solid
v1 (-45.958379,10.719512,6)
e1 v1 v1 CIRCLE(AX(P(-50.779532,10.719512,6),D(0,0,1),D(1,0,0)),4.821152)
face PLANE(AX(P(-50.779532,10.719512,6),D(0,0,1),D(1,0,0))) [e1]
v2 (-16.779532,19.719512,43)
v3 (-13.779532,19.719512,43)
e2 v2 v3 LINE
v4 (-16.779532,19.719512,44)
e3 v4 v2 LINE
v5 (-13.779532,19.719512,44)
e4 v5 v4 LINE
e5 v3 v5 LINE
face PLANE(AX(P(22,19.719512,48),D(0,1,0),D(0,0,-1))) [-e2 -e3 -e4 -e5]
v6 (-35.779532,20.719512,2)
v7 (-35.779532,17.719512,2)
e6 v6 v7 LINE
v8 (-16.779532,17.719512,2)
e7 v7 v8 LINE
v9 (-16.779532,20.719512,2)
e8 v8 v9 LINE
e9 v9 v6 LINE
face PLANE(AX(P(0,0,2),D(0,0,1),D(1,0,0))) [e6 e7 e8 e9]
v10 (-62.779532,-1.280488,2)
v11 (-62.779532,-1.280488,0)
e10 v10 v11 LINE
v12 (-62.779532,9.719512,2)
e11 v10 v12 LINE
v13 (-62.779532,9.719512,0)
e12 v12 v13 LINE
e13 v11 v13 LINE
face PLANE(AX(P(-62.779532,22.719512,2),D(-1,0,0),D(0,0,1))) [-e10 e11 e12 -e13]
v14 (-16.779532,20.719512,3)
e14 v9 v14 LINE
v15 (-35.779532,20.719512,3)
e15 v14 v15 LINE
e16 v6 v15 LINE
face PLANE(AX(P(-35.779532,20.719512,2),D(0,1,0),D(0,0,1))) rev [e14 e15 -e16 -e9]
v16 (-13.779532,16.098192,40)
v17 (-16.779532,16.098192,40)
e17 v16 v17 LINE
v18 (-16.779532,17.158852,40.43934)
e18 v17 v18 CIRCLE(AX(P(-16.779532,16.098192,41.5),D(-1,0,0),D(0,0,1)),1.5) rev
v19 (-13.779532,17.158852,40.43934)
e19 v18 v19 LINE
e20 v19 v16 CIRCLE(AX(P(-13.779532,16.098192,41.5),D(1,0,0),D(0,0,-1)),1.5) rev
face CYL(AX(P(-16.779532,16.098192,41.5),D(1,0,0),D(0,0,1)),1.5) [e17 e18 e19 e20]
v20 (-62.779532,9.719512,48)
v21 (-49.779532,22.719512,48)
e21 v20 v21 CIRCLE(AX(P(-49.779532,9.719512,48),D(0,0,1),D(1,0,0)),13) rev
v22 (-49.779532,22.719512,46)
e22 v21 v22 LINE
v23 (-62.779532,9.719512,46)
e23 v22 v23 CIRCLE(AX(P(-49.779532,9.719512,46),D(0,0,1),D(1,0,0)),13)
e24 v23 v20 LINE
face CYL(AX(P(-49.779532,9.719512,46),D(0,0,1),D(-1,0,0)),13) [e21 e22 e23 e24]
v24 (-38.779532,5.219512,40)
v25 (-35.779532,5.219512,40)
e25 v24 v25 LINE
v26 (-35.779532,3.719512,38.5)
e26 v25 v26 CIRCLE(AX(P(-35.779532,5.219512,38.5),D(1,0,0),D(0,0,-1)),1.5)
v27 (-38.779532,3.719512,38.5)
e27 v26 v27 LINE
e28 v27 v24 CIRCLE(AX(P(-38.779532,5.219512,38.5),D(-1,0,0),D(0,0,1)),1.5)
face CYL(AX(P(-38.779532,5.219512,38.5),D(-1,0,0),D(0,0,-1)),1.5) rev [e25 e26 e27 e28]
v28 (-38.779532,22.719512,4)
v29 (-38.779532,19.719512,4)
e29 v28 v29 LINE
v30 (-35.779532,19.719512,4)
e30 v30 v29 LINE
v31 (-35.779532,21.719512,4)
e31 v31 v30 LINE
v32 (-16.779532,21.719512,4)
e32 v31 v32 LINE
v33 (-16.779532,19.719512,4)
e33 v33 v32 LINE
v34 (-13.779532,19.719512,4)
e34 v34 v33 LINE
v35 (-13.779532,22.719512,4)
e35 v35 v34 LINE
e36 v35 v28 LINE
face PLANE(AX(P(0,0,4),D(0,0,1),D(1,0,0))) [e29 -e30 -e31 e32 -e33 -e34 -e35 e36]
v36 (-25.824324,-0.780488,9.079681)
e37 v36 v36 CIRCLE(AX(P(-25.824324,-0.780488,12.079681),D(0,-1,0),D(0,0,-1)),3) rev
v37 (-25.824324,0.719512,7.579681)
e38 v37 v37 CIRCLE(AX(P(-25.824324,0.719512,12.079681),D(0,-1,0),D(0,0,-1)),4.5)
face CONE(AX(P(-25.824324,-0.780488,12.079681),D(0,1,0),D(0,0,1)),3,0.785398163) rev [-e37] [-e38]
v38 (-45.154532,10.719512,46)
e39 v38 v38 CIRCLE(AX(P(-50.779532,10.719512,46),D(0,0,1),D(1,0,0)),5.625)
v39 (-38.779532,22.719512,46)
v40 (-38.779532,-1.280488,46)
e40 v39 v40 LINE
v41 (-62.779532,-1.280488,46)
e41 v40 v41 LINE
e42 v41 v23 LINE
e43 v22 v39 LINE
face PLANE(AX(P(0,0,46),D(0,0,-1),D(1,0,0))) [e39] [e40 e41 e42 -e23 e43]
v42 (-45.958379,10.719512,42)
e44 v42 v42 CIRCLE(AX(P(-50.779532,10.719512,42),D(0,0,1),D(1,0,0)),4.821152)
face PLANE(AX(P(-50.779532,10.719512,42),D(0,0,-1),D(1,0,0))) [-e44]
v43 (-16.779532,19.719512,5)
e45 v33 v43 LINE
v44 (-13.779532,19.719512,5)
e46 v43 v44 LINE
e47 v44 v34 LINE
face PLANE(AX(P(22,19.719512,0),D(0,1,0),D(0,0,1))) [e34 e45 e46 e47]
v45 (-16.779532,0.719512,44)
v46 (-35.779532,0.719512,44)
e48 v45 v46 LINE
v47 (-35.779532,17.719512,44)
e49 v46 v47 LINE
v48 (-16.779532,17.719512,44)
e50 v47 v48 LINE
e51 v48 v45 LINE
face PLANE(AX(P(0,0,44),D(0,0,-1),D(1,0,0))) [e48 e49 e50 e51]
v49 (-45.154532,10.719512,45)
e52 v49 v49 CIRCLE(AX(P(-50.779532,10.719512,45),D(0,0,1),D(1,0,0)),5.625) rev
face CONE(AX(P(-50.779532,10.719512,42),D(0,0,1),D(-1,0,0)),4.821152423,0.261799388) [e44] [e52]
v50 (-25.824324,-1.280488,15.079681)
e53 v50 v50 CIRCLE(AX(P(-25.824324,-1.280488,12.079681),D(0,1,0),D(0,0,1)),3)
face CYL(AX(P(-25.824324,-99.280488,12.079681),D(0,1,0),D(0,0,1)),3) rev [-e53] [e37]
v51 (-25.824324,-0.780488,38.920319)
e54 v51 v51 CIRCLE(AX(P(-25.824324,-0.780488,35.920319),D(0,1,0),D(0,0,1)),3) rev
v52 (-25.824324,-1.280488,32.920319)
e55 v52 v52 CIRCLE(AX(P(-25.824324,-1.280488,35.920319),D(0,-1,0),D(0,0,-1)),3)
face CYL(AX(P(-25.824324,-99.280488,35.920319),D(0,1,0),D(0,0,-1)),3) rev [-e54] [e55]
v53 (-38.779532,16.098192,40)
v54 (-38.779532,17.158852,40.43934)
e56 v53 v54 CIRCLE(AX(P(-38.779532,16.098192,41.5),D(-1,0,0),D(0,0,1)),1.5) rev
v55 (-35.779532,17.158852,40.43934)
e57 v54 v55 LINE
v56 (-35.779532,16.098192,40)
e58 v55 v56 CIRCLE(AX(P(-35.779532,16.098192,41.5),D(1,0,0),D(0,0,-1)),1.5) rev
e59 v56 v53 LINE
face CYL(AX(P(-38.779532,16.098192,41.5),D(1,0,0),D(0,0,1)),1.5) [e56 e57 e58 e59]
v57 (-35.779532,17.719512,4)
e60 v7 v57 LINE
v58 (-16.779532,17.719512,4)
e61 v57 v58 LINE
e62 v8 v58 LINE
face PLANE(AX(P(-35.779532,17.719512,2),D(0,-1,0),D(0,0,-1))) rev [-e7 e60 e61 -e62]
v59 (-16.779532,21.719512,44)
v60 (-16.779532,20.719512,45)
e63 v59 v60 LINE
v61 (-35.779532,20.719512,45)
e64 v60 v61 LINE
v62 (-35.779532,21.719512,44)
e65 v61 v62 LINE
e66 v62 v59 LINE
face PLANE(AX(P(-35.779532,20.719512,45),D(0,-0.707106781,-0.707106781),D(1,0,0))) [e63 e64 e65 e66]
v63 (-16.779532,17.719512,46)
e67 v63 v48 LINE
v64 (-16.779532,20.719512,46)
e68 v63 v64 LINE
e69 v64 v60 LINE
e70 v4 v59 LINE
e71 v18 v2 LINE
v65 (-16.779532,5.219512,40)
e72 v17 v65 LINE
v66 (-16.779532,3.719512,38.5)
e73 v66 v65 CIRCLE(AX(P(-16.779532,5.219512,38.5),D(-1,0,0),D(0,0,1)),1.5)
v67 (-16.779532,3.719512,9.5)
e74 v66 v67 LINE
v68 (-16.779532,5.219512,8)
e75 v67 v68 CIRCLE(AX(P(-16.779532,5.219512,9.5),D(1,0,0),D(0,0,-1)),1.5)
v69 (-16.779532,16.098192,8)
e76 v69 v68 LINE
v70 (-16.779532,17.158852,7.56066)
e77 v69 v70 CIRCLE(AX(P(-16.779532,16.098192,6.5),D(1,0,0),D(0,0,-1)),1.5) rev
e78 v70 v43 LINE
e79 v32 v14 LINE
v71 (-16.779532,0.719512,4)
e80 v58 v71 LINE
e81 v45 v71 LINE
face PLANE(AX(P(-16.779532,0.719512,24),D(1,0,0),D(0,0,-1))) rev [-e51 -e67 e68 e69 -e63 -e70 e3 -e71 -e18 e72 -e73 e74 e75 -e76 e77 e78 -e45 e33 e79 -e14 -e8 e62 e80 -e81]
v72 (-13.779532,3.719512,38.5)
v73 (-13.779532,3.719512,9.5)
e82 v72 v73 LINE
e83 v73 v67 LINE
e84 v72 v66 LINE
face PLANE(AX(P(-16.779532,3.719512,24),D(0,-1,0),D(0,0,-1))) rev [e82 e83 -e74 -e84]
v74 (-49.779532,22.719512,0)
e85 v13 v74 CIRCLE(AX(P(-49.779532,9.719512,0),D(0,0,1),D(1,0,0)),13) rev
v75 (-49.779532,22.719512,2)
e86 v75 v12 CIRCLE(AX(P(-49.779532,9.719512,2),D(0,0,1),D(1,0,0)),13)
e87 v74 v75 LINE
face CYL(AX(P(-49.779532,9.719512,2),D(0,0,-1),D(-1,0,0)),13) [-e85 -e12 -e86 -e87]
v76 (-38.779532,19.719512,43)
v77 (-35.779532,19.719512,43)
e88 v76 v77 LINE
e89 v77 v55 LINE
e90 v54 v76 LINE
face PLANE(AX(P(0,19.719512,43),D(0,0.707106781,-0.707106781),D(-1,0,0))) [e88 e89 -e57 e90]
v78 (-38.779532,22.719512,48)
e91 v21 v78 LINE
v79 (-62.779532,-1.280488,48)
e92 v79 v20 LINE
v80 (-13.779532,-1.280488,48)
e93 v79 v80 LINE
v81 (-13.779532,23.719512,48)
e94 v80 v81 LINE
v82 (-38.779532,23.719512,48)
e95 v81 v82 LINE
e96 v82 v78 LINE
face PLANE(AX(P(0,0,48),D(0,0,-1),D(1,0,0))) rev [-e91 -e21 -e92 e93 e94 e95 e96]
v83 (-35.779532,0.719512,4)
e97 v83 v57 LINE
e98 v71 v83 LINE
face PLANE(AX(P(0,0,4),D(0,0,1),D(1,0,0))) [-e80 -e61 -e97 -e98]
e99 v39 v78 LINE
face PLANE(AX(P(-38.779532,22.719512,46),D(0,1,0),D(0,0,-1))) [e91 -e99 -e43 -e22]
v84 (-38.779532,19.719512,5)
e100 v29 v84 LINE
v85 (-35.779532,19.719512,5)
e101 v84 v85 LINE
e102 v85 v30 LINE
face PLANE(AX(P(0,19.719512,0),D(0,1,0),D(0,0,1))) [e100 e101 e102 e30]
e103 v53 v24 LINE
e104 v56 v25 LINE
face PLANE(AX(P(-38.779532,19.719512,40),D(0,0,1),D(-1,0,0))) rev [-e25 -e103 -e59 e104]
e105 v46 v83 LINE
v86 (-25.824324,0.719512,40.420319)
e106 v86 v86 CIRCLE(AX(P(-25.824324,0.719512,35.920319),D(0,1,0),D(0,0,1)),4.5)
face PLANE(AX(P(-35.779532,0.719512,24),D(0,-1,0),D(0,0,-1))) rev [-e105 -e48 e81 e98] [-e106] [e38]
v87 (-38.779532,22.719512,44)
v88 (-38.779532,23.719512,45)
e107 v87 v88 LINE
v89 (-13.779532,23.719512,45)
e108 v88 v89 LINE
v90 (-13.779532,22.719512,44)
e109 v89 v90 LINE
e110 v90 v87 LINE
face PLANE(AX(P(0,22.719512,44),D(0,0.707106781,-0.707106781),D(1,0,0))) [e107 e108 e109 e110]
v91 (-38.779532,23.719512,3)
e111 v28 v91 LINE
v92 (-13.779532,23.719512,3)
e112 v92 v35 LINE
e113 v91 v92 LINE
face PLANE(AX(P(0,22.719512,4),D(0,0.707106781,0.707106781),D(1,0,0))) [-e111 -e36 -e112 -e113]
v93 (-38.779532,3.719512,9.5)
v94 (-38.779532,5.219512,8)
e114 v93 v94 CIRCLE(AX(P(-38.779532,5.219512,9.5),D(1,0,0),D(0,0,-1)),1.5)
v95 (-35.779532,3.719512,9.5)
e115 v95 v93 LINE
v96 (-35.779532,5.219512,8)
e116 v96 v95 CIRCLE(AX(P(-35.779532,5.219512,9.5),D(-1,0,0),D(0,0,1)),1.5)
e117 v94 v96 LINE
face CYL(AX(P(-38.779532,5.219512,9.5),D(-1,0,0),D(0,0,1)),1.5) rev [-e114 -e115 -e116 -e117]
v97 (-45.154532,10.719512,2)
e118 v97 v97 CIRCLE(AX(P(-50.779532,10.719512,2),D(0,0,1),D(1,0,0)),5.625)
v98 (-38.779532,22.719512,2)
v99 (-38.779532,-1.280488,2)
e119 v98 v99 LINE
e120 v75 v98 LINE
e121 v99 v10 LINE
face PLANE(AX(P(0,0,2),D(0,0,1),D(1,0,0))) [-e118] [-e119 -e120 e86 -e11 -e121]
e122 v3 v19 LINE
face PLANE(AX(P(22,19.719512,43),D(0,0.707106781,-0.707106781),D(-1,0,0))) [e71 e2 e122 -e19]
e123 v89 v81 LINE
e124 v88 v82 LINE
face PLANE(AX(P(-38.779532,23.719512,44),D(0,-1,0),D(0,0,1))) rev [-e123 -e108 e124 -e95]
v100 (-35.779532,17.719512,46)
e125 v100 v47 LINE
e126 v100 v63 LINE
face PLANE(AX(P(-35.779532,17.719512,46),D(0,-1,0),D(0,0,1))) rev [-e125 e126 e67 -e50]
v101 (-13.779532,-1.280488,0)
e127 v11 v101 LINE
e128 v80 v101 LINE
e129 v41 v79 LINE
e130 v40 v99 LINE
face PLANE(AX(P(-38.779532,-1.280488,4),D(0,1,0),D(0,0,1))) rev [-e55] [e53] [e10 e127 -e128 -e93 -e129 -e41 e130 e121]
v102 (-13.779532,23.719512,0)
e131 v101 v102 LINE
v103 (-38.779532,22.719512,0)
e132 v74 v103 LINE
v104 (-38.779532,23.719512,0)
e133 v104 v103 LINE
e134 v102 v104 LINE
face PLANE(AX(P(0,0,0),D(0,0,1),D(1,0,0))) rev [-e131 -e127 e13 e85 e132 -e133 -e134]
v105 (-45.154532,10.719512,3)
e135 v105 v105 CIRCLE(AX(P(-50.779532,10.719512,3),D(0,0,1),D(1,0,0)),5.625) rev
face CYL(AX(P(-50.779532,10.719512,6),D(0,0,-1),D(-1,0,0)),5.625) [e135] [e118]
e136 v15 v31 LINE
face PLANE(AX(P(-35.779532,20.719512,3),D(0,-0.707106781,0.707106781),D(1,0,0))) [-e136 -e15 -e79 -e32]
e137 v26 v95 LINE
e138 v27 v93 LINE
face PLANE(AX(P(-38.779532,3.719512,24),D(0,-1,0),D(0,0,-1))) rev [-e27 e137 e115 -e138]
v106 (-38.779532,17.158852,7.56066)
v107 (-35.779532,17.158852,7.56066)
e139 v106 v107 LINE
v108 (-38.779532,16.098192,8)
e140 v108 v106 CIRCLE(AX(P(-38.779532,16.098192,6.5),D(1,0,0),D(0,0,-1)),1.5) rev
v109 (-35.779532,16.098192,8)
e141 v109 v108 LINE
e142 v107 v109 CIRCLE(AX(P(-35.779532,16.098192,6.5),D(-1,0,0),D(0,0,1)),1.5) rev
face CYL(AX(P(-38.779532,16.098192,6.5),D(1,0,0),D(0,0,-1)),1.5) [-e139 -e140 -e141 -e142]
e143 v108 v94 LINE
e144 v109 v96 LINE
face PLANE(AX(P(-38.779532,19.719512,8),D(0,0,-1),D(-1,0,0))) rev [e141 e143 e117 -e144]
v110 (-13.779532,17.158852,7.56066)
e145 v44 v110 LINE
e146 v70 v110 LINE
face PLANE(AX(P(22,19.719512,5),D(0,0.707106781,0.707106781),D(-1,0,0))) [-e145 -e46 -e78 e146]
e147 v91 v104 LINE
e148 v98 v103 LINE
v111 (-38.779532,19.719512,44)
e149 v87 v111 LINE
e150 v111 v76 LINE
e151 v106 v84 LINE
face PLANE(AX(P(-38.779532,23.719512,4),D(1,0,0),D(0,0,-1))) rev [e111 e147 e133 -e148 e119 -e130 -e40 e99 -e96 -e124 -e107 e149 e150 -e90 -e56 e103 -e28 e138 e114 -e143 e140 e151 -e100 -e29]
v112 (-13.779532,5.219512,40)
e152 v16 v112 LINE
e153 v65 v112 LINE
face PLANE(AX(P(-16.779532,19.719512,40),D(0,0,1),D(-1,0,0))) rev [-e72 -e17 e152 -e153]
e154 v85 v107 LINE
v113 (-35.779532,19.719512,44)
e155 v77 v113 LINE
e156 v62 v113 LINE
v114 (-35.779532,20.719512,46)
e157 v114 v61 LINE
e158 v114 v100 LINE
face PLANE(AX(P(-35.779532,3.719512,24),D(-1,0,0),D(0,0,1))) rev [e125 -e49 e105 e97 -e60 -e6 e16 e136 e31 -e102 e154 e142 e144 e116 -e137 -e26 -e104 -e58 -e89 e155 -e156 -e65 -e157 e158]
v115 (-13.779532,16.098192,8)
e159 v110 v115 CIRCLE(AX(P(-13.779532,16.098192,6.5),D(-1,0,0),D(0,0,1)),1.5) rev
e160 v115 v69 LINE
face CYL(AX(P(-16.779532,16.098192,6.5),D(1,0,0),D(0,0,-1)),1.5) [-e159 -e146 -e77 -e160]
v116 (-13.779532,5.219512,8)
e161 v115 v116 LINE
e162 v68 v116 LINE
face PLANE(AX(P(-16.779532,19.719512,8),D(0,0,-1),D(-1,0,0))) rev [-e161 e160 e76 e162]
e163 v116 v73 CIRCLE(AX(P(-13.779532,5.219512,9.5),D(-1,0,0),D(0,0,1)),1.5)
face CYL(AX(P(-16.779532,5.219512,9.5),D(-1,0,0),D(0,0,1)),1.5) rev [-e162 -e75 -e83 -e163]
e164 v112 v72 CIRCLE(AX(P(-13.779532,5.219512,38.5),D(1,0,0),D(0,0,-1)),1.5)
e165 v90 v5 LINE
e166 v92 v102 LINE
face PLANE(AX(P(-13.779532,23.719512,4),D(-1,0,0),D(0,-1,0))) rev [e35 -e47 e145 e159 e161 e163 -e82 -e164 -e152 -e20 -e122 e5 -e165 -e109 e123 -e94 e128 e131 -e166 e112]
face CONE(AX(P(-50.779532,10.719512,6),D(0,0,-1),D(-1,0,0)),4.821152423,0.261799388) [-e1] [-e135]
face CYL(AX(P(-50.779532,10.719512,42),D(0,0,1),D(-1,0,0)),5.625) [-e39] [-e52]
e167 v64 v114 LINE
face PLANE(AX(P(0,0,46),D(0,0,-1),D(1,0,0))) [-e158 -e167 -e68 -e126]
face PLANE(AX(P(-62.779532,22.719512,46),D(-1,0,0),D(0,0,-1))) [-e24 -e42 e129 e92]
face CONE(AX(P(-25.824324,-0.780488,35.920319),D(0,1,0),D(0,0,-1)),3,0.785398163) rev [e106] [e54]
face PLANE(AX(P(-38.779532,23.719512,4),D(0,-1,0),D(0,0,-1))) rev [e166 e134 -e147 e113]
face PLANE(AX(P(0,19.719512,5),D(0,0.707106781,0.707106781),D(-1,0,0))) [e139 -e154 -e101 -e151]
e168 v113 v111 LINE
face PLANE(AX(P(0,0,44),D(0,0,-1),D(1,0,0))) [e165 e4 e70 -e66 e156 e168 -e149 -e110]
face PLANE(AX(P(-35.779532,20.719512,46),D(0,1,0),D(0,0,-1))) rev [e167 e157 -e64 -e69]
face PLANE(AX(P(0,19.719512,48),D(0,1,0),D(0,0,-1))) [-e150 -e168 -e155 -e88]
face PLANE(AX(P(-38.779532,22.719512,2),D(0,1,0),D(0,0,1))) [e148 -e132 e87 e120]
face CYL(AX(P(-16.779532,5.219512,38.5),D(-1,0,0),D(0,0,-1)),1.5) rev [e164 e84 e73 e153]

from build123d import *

# Parameters (mm, degrees)
SKETCH_1_W             = 25
SKETCH_1_H             = 25
EXTRUDE_1_DEPTH        = 4
SKETCH_2_W             = 24
SKETCH_2_H             = 24
EXTRUDE_2_DEPTH        = 2
SKETCH_3_R             = 5.625
EXTRUDE_3_DEPTH        = 4
CHAMFER_1_SIZE         = 3
CHAMFER_1_SIZE2        = 0.803847577
EXTRUDE_4_DEPTH        = 2
SKETCH_6_R             = 5
CUT_EXTRUDE_2_DEPTH    = 10
EXTRUDE_6_DEPTH        = 20
SKETCH_9_W             = 19
SKETCH_9_H             = 3
CUT_EXTRUDE_4_DEPTH    = 2
CHAMFER_2_SIZE         = 1
CHAMFER_3_SIZE         = 3.732050808
CHAMFER_3_SIZE_2       = 1
FILLET_1_R             = 13
CHAMFER_4_SIZE         = 1
SKETCH_11_W            = 3
SKETCH_11_H            = 4
EXTRUDE_7_DEPTH        = 16
PATTERN_LINEAR_1_COUNT = 2
PATTERN_LINEAR_1_PITCH = 22
CHAMFER_6_SIZE         = 3
FILLET_2_R             = 1.5
SKETCH_13_W            = 40.293086247
SKETCH_13_H            = 27.591529789
CUT_EXTRUDE_6_DEPTH    = 100
SKETCH_14_R            = 3
CUT_EXTRUDE_7_DEPTH    = 100
CHAMFER_7_SIZE         = 1.5


with BuildPart() as part:
    # Эскиз1 → Бобышка-Вытянуть1 (new body)
    with BuildSketch(Plane.XY):
        with Locations((-26.279531703, 11.219512195)):
            Rectangle(SKETCH_1_W, SKETCH_1_H)
    extrude(amount=EXTRUDE_1_DEPTH)

    # Эскиз2 → Бобышка-Вытянуть2 (add)
    with BuildSketch(Plane(origin=(0, 0, 0), x_dir=(-1, 0, 0), z_dir=(0, 0, -1))):
        with Locations((50.779531703, 10.719512195)):
            Rectangle(SKETCH_2_W, SKETCH_2_H)
    extrude(amount=-EXTRUDE_2_DEPTH)

    # Эскиз3 → Бобышка-Вытянуть3 (add)
    with BuildSketch(Plane.XY.offset(2)):
        with Locations((-50.779531703, 10.719512195)):
            Circle(SKETCH_3_R)
    extrude(amount=EXTRUDE_3_DEPTH)

    # Фаска1
    chamfer_1_edges = [part.edges().sort_by_distance(p)[0] for p in [
        (-56.404531703, 10.719512195, 6),
    ]]
    chamfer_1_side = [part.faces().sort_by_distance(p)[0] for p in [
        (-56.404531703, 10.719512195, 4),
    ]]
    chamfer(chamfer_1_edges, length=CHAMFER_1_SIZE, length2=CHAMFER_1_SIZE2, reference=chamfer_1_side[0])

    # Эскиз5 → Бобышка-Вытянуть4 (add)
    with BuildSketch(Plane.XY.offset(4)):
        with BuildLine():
            Line((-18.981970926, 22.719512195), (-0.779531703, 22.719512195))
            ThreePointArc((-0.779531703, 22.719512195), (11.220468297, 10.719512195), (-0.779531703, -1.280487805))
            Line((-0.779531703, -1.280487805), (-18.981970926, -1.280487805))
            ThreePointArc((-18.981970926, -1.280487805), (-30.981970926, 10.719512195), (-18.981970926, 22.719512195))
        make_face()
    extrude(amount=-EXTRUDE_4_DEPTH)

    # Эскиз6 → Вырез-Вытянуть2 (cut)
    with BuildSketch(Plane(origin=(0, 0, 2), x_dir=(-1, 0, 0), z_dir=(0, 0, -1))):
        with Locations((0.779531703, 10.719512195)):
            Circle(SKETCH_6_R)
    extrude(amount=-CUT_EXTRUDE_2_DEPTH, mode=Mode.SUBTRACT)

    # Эскиз8 → Бобышка-Вытянуть6 (add)
    with BuildSketch(Plane.XY.offset(4)):
        Polygon((-38.779531703, 3.719512195), (-35.779531703, 3.719512195), (-35.779531703, 0.719512195), (-16.779531703, 0.719512195), (-16.779531703, 3.719512195), (-13.779531703, 3.719512195), (-13.779531703, -1.280487805), (-38.779531703, -1.280487805), align=None)
    extrude(amount=EXTRUDE_6_DEPTH)

    # Эскиз9 → Вырез-Вытянуть4 (cut)
    with BuildSketch(Plane.XY.offset(4)):
        with Locations((-26.279531703, 19.219512195)):
            Rectangle(SKETCH_9_W, SKETCH_9_H)
    extrude(amount=-CUT_EXTRUDE_4_DEPTH, mode=Mode.SUBTRACT)

    # Фаска2
    chamfer_2_edges = [part.edges().sort_by_distance(p)[0] for p in [
        (-26.279531703, 20.719512195, 4),
    ]]
    chamfer(chamfer_2_edges, length=CHAMFER_2_SIZE)

    # Фаска3
    # the kernel refuses this chamfer: 3.732050808, 1 mm, written as the material it takes off along each edge
    with BuildSketch(Plane(origin=(-0.779531703, 10.719512195, 2), x_dir=(-1, 0, 0), z_dir=(0, -1, 0))) as chamfer_3_piece_1:
        Polygon((5, -CHAMFER_3_SIZE), (5 + CHAMFER_3_SIZE_2, 0), (5, 0), align=None)
    revolve(axis=Axis((-0.779531703, 10.719512195, 2), (0, 0, -1)), mode=Mode.SUBTRACT)

    # Скругление1
    fillet_1_edges = [part.edges().sort_by_distance(p)[0] for p in [
        (-62.779531703, 22.719512195, 1),
    ]]
    fillet(fillet_1_edges, radius=FILLET_1_R)

    # Фаска4
    chamfer_4_edges = [part.edges().sort_by_distance(p)[0] for p in [
        (-26.279531703, 23.719512195, 4),
    ]]
    chamfer(chamfer_4_edges, length=CHAMFER_4_SIZE)

    # Эскиз11 → Бобышка-Вытянуть7 (add)
    with BuildSketch(Plane(origin=(0, 3.719512195, 0), x_dir=(1, 0, 0), z_dir=(0, 1, 0))):
        with Locations((-37.279531703, -6)):
            Rectangle(SKETCH_11_W, SKETCH_11_H)
    extrude_7 = extrude(amount=EXTRUDE_7_DEPTH)

    # Линейный массив1: Бобышка-Вытянуть7 ×2
    with Locations(*[(i * PATTERN_LINEAR_1_PITCH, 0, 0) for i in range(1, PATTERN_LINEAR_1_COUNT)]):
        add(extrude_7)

    # Фаска6
    chamfer_6_edges = [part.edges().sort_by_distance(p)[0] for p in [
        (-37.279531703, 19.719512195, 8),
        (-15.279531703, 19.719512195, 8),
    ]]
    chamfer(chamfer_6_edges, length=CHAMFER_6_SIZE)

    # Скругление2
    fillet_2_edges = [part.edges().sort_by_distance(p)[0] for p in [
        (-37.279531703, 3.719512195, 8),
        (-15.279531703, 3.719512195, 8),
        (-15.279531703, 16.719512195, 8),
        (-37.279531703, 16.719512195, 8),
    ]]
    fillet(fillet_2_edges, radius=FILLET_2_R)

    # Эскиз13 → Вырез-Вытянуть6 (cut)
    with BuildSketch(Plane.XY.offset(4)):
        with Locations((6.36701142, 8.923747301)):
            Rectangle(SKETCH_13_W, SKETCH_13_H)
    extrude(amount=-CUT_EXTRUDE_6_DEPTH, mode=Mode.SUBTRACT)

    # Эскиз14 → Вырез-Вытянуть7 (cut)
    with BuildSketch(Plane(origin=(0, 0.719512195, 0), x_dir=(1, 0, 0), z_dir=(0, 1, 0))):
        with Locations(Location((-25.824324294, -12.079681064, 0), (0, 0, 270))):
            Circle(SKETCH_14_R)
    extrude(amount=-CUT_EXTRUDE_7_DEPTH, mode=Mode.SUBTRACT)

    # Фаска7
    chamfer_7_edges = [part.edges().sort_by_distance(p)[0] for p in [
        (-25.824324294, 0.719512195, 9.079681064),
    ]]
    chamfer(chamfer_7_edges, length=CHAMFER_7_SIZE)

    # Зеркальное отражение1: part across plane


with BuildPart() as part_1:
    add(part.part)
    add(part.part.mirror(Plane(origin=(0, 0, 24), x_dir=(1, 0, 0), z_dir=(0, 0, -1))))


solid = part_1.part
